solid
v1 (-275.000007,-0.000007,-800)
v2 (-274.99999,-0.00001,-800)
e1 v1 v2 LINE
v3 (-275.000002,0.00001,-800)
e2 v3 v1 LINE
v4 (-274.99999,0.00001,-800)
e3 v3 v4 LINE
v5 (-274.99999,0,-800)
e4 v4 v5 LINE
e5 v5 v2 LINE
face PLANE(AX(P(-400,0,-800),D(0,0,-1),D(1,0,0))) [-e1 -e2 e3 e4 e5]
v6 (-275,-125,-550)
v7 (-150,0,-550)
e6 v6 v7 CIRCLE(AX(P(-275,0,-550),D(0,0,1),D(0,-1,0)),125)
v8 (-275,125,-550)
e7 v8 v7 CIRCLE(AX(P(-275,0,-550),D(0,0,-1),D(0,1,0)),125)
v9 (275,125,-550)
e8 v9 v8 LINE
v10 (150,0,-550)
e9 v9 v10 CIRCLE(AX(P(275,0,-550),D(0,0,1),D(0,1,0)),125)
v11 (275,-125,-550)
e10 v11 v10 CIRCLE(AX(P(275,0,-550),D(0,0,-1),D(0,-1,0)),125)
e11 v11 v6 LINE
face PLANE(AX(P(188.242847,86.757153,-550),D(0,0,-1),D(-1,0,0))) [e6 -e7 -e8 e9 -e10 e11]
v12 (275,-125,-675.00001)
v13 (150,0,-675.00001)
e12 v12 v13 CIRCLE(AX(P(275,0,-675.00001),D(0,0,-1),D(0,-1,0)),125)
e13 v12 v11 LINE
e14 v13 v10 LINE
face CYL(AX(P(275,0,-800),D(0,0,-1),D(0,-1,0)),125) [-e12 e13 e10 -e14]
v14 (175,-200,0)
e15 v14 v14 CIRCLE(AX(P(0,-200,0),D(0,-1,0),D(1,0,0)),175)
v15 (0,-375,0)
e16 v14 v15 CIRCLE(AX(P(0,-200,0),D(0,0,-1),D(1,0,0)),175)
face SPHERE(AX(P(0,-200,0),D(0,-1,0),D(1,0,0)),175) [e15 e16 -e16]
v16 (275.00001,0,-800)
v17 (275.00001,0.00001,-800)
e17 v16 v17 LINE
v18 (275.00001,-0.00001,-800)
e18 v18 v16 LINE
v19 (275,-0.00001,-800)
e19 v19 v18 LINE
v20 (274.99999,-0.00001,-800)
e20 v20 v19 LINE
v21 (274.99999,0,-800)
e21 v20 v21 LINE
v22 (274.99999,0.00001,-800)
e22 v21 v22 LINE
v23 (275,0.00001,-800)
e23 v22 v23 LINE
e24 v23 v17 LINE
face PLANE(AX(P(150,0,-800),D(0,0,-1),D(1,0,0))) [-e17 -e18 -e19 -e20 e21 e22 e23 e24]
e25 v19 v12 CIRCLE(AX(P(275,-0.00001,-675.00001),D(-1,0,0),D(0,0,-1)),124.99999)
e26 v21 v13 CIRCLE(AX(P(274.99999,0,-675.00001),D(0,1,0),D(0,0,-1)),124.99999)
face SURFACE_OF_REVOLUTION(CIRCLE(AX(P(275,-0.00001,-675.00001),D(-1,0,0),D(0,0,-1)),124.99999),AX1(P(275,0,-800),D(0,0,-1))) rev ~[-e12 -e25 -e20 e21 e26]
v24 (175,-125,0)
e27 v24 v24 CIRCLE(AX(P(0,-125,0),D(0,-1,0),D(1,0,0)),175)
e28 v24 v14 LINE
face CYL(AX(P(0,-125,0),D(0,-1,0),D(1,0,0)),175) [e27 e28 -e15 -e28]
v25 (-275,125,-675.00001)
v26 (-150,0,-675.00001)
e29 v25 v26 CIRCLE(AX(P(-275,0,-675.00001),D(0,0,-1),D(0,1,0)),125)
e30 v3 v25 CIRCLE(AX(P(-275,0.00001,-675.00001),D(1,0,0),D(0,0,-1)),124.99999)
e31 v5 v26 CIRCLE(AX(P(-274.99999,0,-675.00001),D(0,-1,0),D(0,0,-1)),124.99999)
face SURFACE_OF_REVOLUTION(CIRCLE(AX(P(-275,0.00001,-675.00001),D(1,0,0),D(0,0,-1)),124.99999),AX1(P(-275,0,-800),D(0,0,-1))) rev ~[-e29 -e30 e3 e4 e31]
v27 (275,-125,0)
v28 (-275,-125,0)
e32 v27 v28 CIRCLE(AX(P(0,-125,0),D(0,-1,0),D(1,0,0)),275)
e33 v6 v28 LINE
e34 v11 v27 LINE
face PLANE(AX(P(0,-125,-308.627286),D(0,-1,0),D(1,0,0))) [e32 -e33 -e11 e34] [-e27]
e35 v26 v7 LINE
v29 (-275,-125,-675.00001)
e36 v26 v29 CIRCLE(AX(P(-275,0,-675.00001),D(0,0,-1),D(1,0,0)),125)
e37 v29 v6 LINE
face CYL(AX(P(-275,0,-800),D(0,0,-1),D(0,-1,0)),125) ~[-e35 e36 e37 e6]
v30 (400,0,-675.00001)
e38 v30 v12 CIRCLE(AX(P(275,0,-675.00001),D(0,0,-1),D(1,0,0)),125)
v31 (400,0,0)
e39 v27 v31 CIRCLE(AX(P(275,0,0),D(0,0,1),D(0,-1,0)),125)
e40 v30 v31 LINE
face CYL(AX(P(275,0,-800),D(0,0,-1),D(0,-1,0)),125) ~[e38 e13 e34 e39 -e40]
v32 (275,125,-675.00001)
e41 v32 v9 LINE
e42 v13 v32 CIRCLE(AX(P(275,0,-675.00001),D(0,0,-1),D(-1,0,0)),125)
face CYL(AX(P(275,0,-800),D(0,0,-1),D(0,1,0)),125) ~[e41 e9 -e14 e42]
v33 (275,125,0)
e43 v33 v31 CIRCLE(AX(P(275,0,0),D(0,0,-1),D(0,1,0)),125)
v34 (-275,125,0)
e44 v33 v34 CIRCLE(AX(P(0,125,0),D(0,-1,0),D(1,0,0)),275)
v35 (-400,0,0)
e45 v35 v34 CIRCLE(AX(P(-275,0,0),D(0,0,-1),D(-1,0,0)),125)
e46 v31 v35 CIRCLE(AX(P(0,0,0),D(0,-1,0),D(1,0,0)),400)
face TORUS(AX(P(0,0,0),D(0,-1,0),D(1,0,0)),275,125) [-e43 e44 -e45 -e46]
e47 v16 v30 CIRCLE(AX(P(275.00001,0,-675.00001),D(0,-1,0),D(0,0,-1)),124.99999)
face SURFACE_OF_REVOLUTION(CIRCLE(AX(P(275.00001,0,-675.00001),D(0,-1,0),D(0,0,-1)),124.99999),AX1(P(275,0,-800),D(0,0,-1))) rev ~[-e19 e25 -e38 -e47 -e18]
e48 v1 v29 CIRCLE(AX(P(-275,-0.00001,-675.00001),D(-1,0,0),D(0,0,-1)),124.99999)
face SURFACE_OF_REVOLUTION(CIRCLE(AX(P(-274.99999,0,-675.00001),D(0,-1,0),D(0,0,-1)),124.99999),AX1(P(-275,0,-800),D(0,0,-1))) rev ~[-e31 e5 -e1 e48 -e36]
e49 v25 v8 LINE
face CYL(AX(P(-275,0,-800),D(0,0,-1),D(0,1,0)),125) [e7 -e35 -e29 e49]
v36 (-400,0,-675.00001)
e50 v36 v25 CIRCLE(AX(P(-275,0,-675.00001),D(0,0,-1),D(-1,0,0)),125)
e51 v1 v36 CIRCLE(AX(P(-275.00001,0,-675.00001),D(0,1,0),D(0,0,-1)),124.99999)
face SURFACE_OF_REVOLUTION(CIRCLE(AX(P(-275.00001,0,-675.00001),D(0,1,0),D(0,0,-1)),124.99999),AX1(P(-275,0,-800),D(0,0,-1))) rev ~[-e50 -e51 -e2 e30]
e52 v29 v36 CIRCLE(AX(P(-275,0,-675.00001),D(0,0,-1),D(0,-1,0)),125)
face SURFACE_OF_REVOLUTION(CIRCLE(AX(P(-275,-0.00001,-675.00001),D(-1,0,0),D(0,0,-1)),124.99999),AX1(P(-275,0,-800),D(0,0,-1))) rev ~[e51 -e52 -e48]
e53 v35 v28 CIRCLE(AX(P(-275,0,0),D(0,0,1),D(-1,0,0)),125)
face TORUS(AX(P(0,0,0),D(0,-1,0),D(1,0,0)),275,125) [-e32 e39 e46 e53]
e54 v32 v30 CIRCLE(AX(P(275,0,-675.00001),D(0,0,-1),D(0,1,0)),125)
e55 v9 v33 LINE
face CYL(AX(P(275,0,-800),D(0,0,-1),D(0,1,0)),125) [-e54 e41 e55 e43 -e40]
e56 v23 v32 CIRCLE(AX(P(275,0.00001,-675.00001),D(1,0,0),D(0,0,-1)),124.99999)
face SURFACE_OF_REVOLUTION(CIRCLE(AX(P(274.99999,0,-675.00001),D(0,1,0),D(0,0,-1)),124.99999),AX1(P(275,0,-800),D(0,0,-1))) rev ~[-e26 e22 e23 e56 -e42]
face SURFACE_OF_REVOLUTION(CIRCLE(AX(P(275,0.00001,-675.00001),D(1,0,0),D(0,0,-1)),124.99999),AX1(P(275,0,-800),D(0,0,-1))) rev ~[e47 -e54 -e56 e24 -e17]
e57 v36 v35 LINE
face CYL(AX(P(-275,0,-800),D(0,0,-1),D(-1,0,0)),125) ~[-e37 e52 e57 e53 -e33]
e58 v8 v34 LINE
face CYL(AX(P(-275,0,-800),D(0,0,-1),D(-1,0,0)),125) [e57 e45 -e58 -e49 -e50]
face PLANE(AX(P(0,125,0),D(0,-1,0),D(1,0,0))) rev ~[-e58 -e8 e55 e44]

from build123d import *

# Parameters (mm, degrees)
F1_DEPTH     = 125
F2_R         = 175
F3_DEPTH     = 250
F4_R         = 124.99999
F5_T1_DEPTH  = 800
F5_T3_DEPTH  = 250
F5_T6_ANGLE  = 90
F5_T8_ANGLE  = 90
F5_T10_ANGLE = 90
F5_T12_ANGLE = 90
F5_T14_ANGLE = 90
F5_T16_ANGLE = 90
F5_T18_ANGLE = 90
F5_T20_ANGLE = 90
F5_T22_ANGLE = 180
F5_T24_ANGLE = 180
F6_R         = 175


# Not quite as in the source:
# - a fillet or chamfer that OpenCascade refuses, or shapes differently, is made with other operations: its cross-section is extruded or revolved along the edge and cut away or added
# - a fillet or chamfer is up to 0.001 mm smaller than in the source, because OpenCascade refuses the exact size


with BuildPart() as f1:
    # F0 (on Front) → F1 (new body, symmetric)
    with BuildSketch(Plane.XZ):
        with BuildLine():
            Line((400, -800), (400, 0))
            ThreePointArc((400, 0), (0, 400), (-400, 0))
            Line((-400, 0), (-400, -800))
            Line((-400, -800), (-150, -800))
            Line((-150, -800), (-150, -550))
            Line((-150, -550), (150, -550))
            Line((150, -550), (150, -800))
            Line((150, -800), (400, -800))
        make_face()
    extrude(amount=F1_DEPTH, both=True)

    # F2 (on face) → F3 (join, symmetric)
    with BuildSketch(Plane.XZ.offset(125)):
        Circle(F2_R)
    extrude(amount=F3_DEPTH, both=True)

    # F4 (radius 125 in the source; OpenCascade refuses exactly that, so slightly less here)
    f4_edges = [f1.edges().sort_by_distance(p)[0] for p in [
        (-400, 0, -800),
        (-275, 125, -800),
        (-150, 0, -800),
        (-275, -125, -800),
        (150, 0, -800),
        (275, 125, -800),
        (400, 0, -800),
        (275, -125, -800),
    ]]
    fillet(f4_edges, radius=F4_R)

    # F5: fillet of radius 125 on 8 edges, made by hand

    # F5_s2 → F5_t1 (cut)
    with BuildSketch(Plane.XY.offset(-800)):
        with BuildLine():
            ThreePointArc((275, -125), (363.3883476483, -88.3883476483), (400, 0))
            Line((400, 0), (400, -125))
            Line((400, -125), (275, -125))
        make_face()
        with BuildLine():
            ThreePointArc((275, 125), (363.3883476483, 88.3883476483), (400, 0))
            Line((400, 0), (400, 125))
            Line((400, 125), (275, 125))
        make_face()
        with BuildLine():
            ThreePointArc((-400, 0), (-363.3883476483, -88.3883476483), (-275, -125))
            Line((-275, -125), (-400, -125))
            Line((-400, -125), (-400, 0))
        make_face()
        with BuildLine():
            ThreePointArc((-400, 0), (-363.3883476483, 88.3883476483), (-275, 125))
            Line((-275, 125), (-400, 125))
            Line((-400, 125), (-400, 0))
        make_face()
    extrude(amount=F5_T1_DEPTH, mode=Mode.SUBTRACT)

    # F5_s4 → F5_t3 (cut)
    with BuildSketch(Plane.XY.offset(-800)):
        with BuildLine():
            ThreePointArc((-275, 125), (-186.6116523517, 88.3883476483), (-150, 0))
            Line((-150, 0), (-150, 125))
            Line((-150, 125), (-275, 125))
        make_face()
        with BuildLine():
            ThreePointArc((-275, -125), (-186.6116523517, -88.3883476483), (-150, 0))
            Line((-150, 0), (-150, -125))
            Line((-150, -125), (-275, -125))
        make_face()
        with BuildLine():
            ThreePointArc((275, -125), (186.6116523517, -88.3883476483), (150, 0))
            Line((150, 0), (150, -125))
            Line((150, -125), (275, -125))
        make_face()
        with BuildLine():
            ThreePointArc((275, 125), (186.6116523517, 88.3883476483), (150, 0))
            Line((150, 0), (150, 125))
            Line((150, 125), (275, 125))
        make_face()
    extrude(amount=F5_T3_DEPTH, mode=Mode.SUBTRACT)

    # F5_s5 → F5_t6 (revolve, cut)
    with BuildSketch(Plane.XZ):
        with BuildLine():
            ThreePointArc((274.99999, -800), (186.6116494227, -763.3883505773), (150, -675.00001))
            Line((150, -675.00001), (150, -800))
            Line((150, -800), (274.99999, -800))
        make_face()
    revolve(axis=Axis((275, 0, -800), (0, 0, -1)), revolution_arc=F5_T6_ANGLE, mode=Mode.SUBTRACT)

    # F5_s7 → F5_t8 (revolve, cut)
    with BuildSketch(Plane.YZ.offset(275)):
        with BuildLine():
            ThreePointArc((-1e-05, -800), (-88.3883505773, -763.3883505773), (-125, -675.00001))
            Line((-125, -675.00001), (-125, -800))
            Line((-125, -800), (-1e-05, -800))
        make_face()
    revolve(axis=Axis((275, 0, -800), (0, 0, -1)), revolution_arc=F5_T8_ANGLE, mode=Mode.SUBTRACT)

    # F5_s9 → F5_t10 (revolve, cut)
    with BuildSketch(Plane.XZ):
        with BuildLine():
            ThreePointArc((-274.99999, -800), (-186.6116494227, -763.3883505773), (-150, -675.00001))
            Line((-150, -675.00001), (-150, -800))
            Line((-150, -800), (-274.99999, -800))
        make_face()
    revolve(axis=Axis((-275, 0, -800), (0, 0, -1)), revolution_arc=F5_T10_ANGLE, mode=Mode.SUBTRACT)

    # F5_s11 → F5_t12 (revolve, cut)
    with BuildSketch(Plane.YZ.offset(-275)):
        with BuildLine():
            ThreePointArc((1e-05, -800), (88.3883505773, -763.3883505773), (125, -675.00001))
            Line((125, -675.00001), (125, -800))
            Line((125, -800), (1e-05, -800))
        make_face()
    revolve(axis=Axis((-275, 0, -800), (0, 0, -1)), revolution_arc=F5_T12_ANGLE, mode=Mode.SUBTRACT)

    # F5_s13 → F5_t14 (revolve, cut)
    with BuildSketch(Plane.XZ):
        with BuildLine():
            ThreePointArc((-275.00001, -800), (-363.3883505773, -763.3883505773), (-400, -675.00001))
            Line((-400, -675.00001), (-400, -800))
            Line((-400, -800), (-275.00001, -800))
        make_face()
    revolve(axis=Axis((-275, 0, -800), (0, 0, -1)), revolution_arc=F5_T14_ANGLE, mode=Mode.SUBTRACT)

    # F5_s15 → F5_t16 (revolve, cut)
    with BuildSketch(Plane.YZ.offset(-275)):
        with BuildLine():
            ThreePointArc((-1e-05, -800), (-88.3883505773, -763.3883505773), (-125, -675.00001))
            Line((-125, -675.00001), (-125, -800))
            Line((-125, -800), (-1e-05, -800))
        make_face()
    revolve(axis=Axis((-275, 0, -800), (0, 0, -1)), revolution_arc=F5_T16_ANGLE, mode=Mode.SUBTRACT)

    # F5_s17 → F5_t18 (revolve, cut)
    with BuildSketch(Plane.YZ.offset(275)):
        with BuildLine():
            ThreePointArc((1e-05, -800), (88.3883505773, -763.3883505773), (125, -675.00001))
            Line((125, -675.00001), (125, -800))
            Line((125, -800), (1e-05, -800))
        make_face()
    revolve(axis=Axis((275, 0, -800), (0, 0, -1)), revolution_arc=F5_T18_ANGLE, mode=Mode.SUBTRACT)

    # F5_s19 → F5_t20 (revolve, cut)
    with BuildSketch(Plane.XZ):
        with BuildLine():
            ThreePointArc((275.00001, -800), (363.3883505773, -763.3883505773), (400, -675.00001))
            Line((400, -675.00001), (400, -800))
            Line((400, -800), (275.00001, -800))
        make_face()
    revolve(axis=Axis((275, 0, -800), (0, 0, -1)), revolution_arc=F5_T20_ANGLE, mode=Mode.SUBTRACT)

    # F5_s21 → F5_t22 (revolve, cut)
    with BuildSketch(Plane.XY):
        with BuildLine():
            ThreePointArc((275, 125), (363.3883476483, 88.3883476483), (400, 0))
            Line((400, 0), (400, 125))
            Line((400, 125), (275, 125))
        make_face()
    revolve(axis=Axis((0, 125, 0), (0, -1, 0)), revolution_arc=F5_T22_ANGLE, mode=Mode.SUBTRACT)

    # F5_s23 → F5_t24 (revolve, cut)
    with BuildSketch(Plane.XY):
        with BuildLine():
            ThreePointArc((400, 0), (363.3883476483, -88.3883476483), (275, -125))
            Line((275, -125), (400, -125))
            Line((400, -125), (400, 0))
        make_face()
    revolve(axis=Axis((0, -125, 0), (0, -1, 0)), revolution_arc=F5_T24_ANGLE, mode=Mode.SUBTRACT)

    # F6
    f6_edges = [f1.edges().sort_by_distance(p)[0] for p in [
        (-175, -375, 0),
    ]]
    fillet(f6_edges, radius=F6_R)


solid = f1.part
